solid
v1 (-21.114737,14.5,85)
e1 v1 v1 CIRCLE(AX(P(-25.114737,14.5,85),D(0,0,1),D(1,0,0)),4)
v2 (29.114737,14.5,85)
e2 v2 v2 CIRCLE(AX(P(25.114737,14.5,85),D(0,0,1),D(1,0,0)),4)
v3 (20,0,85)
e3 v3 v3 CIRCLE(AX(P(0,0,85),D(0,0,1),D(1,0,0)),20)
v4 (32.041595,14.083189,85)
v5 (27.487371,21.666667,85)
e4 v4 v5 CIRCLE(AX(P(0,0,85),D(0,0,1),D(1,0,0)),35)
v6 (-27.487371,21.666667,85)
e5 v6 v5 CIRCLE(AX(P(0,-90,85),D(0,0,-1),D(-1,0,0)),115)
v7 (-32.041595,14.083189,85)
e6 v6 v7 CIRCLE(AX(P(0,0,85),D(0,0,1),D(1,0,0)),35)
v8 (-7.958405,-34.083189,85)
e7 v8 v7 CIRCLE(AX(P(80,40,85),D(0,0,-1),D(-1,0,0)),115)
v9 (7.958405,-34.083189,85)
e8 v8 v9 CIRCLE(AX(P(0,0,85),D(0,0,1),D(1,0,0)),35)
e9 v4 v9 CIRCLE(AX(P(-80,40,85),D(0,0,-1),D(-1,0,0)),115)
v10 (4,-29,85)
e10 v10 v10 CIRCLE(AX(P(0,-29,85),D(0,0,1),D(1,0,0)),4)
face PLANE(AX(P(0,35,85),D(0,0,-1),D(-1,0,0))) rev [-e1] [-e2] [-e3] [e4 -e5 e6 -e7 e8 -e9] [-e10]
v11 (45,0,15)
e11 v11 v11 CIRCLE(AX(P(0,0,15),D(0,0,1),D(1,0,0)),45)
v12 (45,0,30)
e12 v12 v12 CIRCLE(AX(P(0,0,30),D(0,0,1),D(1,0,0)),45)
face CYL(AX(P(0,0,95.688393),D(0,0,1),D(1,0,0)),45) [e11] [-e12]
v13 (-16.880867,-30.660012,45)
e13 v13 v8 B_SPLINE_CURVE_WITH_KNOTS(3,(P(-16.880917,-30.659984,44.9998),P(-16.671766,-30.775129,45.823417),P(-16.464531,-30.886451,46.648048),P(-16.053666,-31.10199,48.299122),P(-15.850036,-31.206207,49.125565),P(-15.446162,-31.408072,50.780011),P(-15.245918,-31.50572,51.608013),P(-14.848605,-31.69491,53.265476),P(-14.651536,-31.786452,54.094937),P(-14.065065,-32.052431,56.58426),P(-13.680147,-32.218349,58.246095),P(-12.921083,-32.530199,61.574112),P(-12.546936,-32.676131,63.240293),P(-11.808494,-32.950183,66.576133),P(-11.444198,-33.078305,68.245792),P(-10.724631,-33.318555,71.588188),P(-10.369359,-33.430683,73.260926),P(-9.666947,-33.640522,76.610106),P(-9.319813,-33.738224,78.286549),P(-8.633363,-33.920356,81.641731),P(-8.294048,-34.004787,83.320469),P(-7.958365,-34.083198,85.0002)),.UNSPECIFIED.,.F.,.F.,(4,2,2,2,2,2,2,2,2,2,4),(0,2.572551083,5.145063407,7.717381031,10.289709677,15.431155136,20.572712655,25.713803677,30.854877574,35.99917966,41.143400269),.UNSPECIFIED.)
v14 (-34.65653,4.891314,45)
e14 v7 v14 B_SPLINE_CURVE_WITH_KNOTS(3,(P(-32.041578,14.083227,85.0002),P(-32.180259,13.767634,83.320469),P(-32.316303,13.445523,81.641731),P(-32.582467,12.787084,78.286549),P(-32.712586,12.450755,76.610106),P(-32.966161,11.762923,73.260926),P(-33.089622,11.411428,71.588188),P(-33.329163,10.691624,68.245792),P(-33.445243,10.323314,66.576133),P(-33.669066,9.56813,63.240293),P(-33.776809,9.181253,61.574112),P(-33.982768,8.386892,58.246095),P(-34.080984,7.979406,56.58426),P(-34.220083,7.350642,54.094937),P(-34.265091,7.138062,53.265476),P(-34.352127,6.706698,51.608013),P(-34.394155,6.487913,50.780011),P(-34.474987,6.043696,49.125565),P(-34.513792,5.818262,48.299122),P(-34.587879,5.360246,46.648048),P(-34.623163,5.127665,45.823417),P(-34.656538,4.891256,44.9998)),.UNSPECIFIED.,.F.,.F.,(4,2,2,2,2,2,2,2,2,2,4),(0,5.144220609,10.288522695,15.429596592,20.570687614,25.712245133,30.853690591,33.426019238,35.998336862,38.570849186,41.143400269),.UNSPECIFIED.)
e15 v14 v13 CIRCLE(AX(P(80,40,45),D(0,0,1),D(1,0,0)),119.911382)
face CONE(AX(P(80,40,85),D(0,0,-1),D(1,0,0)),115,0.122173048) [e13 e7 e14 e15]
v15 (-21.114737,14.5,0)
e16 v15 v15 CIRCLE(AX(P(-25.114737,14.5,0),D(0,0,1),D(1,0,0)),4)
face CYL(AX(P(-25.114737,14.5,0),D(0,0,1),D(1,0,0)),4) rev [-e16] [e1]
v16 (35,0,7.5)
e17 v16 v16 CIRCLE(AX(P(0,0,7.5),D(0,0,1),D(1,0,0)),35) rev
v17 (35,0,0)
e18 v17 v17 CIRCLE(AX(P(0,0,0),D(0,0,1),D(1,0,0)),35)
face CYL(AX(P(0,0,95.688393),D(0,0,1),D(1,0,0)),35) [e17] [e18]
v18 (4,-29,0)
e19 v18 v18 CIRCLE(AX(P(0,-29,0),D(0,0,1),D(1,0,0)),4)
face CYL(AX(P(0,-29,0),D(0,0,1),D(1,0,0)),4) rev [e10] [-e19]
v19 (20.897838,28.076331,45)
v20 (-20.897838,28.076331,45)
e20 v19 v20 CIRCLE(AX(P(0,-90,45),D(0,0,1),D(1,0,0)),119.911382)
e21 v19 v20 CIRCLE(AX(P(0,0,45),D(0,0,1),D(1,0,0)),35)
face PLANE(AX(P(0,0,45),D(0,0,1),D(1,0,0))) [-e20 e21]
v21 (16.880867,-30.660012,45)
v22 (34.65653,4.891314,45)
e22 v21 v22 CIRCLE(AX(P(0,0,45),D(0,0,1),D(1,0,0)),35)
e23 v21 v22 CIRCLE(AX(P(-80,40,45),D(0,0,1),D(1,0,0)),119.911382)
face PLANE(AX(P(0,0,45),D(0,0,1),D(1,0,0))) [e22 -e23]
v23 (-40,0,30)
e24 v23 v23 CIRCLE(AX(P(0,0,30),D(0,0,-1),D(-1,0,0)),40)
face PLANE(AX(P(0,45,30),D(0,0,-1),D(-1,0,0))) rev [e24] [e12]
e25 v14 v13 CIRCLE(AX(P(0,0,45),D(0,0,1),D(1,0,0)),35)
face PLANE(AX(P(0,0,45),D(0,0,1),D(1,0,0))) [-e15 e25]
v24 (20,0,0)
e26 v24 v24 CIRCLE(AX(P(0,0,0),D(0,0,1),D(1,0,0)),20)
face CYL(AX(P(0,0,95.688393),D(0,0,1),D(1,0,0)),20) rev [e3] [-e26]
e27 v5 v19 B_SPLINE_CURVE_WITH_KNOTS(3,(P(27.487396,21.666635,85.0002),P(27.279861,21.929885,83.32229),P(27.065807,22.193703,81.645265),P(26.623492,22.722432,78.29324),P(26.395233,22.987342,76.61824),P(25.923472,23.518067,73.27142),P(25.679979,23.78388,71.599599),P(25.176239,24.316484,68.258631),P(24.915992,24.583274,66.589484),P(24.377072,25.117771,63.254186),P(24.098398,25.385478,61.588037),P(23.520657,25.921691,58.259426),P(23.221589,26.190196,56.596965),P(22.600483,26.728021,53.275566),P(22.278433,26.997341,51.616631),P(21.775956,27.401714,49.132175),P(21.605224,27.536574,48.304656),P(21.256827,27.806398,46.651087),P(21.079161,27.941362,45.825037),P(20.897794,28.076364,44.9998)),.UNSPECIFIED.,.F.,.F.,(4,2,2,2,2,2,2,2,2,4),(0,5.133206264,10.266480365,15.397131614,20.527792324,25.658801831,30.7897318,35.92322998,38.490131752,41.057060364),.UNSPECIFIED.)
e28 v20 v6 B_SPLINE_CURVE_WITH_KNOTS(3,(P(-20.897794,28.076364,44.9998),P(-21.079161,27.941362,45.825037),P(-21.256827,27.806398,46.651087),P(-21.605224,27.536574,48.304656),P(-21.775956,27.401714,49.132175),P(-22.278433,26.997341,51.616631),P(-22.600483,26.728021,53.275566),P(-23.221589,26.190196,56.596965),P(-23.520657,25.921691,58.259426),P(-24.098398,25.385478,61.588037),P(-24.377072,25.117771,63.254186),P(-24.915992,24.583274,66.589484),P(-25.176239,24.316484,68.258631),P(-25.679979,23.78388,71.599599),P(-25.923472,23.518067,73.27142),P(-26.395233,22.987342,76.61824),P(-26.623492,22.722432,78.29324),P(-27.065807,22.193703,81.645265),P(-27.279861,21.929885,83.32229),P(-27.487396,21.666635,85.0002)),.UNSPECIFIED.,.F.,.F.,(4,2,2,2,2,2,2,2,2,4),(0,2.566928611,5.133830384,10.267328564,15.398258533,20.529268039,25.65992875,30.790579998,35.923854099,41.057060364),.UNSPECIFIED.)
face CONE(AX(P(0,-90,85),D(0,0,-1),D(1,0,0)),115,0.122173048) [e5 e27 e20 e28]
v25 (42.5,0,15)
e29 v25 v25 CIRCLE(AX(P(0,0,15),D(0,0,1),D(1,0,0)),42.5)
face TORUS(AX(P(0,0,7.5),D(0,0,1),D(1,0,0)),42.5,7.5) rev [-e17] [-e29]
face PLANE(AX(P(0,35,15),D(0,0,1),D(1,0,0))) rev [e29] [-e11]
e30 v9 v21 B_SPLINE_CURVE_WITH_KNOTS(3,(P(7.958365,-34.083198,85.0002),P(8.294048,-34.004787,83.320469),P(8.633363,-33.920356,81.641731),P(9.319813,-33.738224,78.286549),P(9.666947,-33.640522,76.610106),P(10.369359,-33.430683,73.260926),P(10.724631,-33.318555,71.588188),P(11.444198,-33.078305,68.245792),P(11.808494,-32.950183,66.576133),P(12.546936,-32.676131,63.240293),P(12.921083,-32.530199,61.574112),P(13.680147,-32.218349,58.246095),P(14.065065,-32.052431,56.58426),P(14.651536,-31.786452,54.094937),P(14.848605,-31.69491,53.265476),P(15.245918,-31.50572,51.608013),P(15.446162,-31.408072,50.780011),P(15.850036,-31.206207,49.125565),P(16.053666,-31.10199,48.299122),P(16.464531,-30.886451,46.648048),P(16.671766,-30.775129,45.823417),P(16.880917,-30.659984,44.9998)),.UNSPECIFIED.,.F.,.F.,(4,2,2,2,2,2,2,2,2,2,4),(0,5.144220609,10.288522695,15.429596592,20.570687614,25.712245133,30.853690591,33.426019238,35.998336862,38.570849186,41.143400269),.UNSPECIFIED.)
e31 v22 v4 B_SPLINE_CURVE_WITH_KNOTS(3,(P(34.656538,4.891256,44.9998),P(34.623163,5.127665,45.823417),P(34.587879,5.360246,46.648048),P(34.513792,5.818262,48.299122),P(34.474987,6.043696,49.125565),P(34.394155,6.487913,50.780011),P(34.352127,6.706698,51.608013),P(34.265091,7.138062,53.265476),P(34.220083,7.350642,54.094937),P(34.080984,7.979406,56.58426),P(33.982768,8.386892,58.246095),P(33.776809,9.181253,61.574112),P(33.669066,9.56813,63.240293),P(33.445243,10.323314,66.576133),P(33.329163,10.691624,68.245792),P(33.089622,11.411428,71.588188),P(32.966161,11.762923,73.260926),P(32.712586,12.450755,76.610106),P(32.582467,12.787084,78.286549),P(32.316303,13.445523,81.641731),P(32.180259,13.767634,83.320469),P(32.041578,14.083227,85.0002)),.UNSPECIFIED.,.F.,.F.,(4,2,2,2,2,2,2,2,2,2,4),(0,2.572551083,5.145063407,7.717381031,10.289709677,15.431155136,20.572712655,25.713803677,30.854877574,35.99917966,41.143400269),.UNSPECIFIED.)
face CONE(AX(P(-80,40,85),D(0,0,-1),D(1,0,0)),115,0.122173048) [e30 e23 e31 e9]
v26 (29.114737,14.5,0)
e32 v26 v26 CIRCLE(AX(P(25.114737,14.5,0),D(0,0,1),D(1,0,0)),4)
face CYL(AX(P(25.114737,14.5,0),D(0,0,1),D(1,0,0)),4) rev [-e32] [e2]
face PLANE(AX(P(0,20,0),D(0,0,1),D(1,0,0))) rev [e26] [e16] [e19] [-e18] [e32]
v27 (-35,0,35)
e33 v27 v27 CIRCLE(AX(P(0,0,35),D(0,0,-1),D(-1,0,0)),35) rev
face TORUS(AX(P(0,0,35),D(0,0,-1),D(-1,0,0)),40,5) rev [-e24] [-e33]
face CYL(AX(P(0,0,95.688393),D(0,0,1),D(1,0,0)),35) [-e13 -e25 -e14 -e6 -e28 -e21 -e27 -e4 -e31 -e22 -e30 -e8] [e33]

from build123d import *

# Parameters (mm, degrees)
FILLET1_R            = 7.5
FILLET2_R            = 5
CUT_EXTRUDE4_DEPTH   = 40
CUT_EXTRUDE4_DRAFT   = -7
CUT_EXTRUDE4_2_DEPTH = 40
CUT_EXTRUDE4_2_DRAFT = -7
CUT_EXTRUDE4_3_DEPTH = 40
CUT_EXTRUDE4_3_DRAFT = -7
SKETCH4_R            = 4
CUT_EXTRUDE5_DEPTH   = 107.183802908


# Read off the part's stored shape, not the designer's step: Cut-Extrude4
with BuildPart() as part:
    # Sketch1 → Revolve1 (revolve)
    with BuildSketch(Plane(origin=(0, 0, 0), x_dir=(0, 0, -1), z_dir=(1, 0, 0)), mode=Mode.PRIVATE) as revolve1_sk:
        Polygon((0, 20), (-85, 20), (-85, 35), (-30, 35), (-30, 45), (-15, 45), (-15, 35), (0, 35), align=None)
    revolve(revolve1_sk.sketch.rotate(Axis((0, 0, 95.688392975), (0, 0, -1)), 90), axis=Axis((0, 0, 95.688392975), (0, 0, -1)))

    # Fillet1
    fillet1_edges = [part.edges().sort_by_distance(p)[0] for p in [
        (-35, 0, 15),
    ]]
    fillet(fillet1_edges, radius=FILLET1_R)

    # Fillet2
    fillet2_edges = [part.edges().sort_by_distance(p)[0] for p in [
        (-35, 0, 30),
    ]]
    fillet(fillet2_edges, radius=FILLET2_R)


with BuildPart() as cut_extrude4_tool:
    # Cut-Extrude4 outline → Cut-Extrude4 (with draft: the straight prism first)
    with BuildSketch(Plane.XY.offset(45)):
        with BuildLine():
            ThreePointArc((16.880866709, -30.660012054), (31.304951685, -15.652475842), (34.656529669, 4.891313865))
            ThreePointArc((34.656529669, 4.891313865), (27.252000961, -13.626000481), (16.880866709, -30.660012054))
        make_face()
    extrude(amount=CUT_EXTRUDE4_DEPTH)
    # Cut-Extrude4: the draft: its side faces are tilted about the plane it starts from
    cut_extrude4_sides = [cut_extrude4_tool.faces().sort_by_distance(p)[0] for p in [
        (27.252000961, -13.626000481, 65),
        (31.304951685, -15.652475842, 65),
    ]]
    draft(cut_extrude4_sides, Plane.XY.offset(45), CUT_EXTRUDE4_DRAFT)


with BuildPart() as part_1:
    add(part.part)

    # Cut-Extrude4: cut by cut_extrude4_tool
    add(cut_extrude4_tool.part, mode=Mode.SUBTRACT)


with BuildPart() as cut_extrude4_2_tool:
    # Cut-Extrude4 2 outline → Cut-Extrude4 2 (with draft: the straight prism first)
    with BuildSketch(Plane.XY.offset(45)):
        with BuildLine():
            ThreePointArc((-34.656529669, 4.891313865), (-31.304951685, -15.652475842), (-16.880866709, -30.660012054))
            ThreePointArc((-16.880866709, -30.660012054), (-27.252000961, -13.626000481), (-34.656529669, 4.891313865))
        make_face()
    extrude(amount=CUT_EXTRUDE4_2_DEPTH)
    # Cut-Extrude4 2: the draft: its side faces are tilted about the plane it starts from
    cut_extrude4_2_sides = [cut_extrude4_2_tool.faces().sort_by_distance(p)[0] for p in [
        (-31.304951685, -15.652475842, 65),
        (-27.252000961, -13.626000481, 65),
    ]]
    draft(cut_extrude4_2_sides, Plane.XY.offset(45), CUT_EXTRUDE4_2_DRAFT)


with BuildPart() as part_2:
    add(part_1.part)

    # Cut-Extrude4 2: cut by cut_extrude4_2_tool
    add(cut_extrude4_2_tool.part, mode=Mode.SUBTRACT)


with BuildPart() as cut_extrude4_3_tool:
    # Cut-Extrude4 3 outline → Cut-Extrude4 3 (with draft: the straight prism first)
    with BuildSketch(Plane.XY.offset(45)):
        with BuildLine():
            ThreePointArc((20.897837677, 28.076331321), (0, 35), (-20.897837677, 28.076331321))
            ThreePointArc((-20.897837677, 28.076331321), (0, 29.911382436), (20.897837677, 28.076331321))
        make_face()
    extrude(amount=CUT_EXTRUDE4_3_DEPTH)
    # Cut-Extrude4 3: the draft: its side faces are tilted about the plane it starts from
    cut_extrude4_3_sides = [cut_extrude4_3_tool.faces().sort_by_distance(p)[0] for p in [
        (0, 35, 65),
        (0, 29.911382436, 65),
    ]]
    draft(cut_extrude4_3_sides, Plane.XY.offset(45), CUT_EXTRUDE4_3_DRAFT)


with BuildPart() as part_3:
    add(part_2.part)

    # Cut-Extrude4 3: cut by cut_extrude4_3_tool
    add(cut_extrude4_3_tool.part, mode=Mode.SUBTRACT)

    # Sketch4 → Cut-Extrude5 (cut, through all)
    with BuildSketch(Plane.XY.offset(85)):
        with Locations((25.11473671, 14.5)):
            Circle(SKETCH4_R)
        with Locations((-25.11473671, 14.5)):
            Circle(SKETCH4_R)
        with Locations((0, -29)):
            Circle(SKETCH4_R)
    extrude(amount=-CUT_EXTRUDE5_DEPTH, mode=Mode.SUBTRACT)


solid = part_3.part
